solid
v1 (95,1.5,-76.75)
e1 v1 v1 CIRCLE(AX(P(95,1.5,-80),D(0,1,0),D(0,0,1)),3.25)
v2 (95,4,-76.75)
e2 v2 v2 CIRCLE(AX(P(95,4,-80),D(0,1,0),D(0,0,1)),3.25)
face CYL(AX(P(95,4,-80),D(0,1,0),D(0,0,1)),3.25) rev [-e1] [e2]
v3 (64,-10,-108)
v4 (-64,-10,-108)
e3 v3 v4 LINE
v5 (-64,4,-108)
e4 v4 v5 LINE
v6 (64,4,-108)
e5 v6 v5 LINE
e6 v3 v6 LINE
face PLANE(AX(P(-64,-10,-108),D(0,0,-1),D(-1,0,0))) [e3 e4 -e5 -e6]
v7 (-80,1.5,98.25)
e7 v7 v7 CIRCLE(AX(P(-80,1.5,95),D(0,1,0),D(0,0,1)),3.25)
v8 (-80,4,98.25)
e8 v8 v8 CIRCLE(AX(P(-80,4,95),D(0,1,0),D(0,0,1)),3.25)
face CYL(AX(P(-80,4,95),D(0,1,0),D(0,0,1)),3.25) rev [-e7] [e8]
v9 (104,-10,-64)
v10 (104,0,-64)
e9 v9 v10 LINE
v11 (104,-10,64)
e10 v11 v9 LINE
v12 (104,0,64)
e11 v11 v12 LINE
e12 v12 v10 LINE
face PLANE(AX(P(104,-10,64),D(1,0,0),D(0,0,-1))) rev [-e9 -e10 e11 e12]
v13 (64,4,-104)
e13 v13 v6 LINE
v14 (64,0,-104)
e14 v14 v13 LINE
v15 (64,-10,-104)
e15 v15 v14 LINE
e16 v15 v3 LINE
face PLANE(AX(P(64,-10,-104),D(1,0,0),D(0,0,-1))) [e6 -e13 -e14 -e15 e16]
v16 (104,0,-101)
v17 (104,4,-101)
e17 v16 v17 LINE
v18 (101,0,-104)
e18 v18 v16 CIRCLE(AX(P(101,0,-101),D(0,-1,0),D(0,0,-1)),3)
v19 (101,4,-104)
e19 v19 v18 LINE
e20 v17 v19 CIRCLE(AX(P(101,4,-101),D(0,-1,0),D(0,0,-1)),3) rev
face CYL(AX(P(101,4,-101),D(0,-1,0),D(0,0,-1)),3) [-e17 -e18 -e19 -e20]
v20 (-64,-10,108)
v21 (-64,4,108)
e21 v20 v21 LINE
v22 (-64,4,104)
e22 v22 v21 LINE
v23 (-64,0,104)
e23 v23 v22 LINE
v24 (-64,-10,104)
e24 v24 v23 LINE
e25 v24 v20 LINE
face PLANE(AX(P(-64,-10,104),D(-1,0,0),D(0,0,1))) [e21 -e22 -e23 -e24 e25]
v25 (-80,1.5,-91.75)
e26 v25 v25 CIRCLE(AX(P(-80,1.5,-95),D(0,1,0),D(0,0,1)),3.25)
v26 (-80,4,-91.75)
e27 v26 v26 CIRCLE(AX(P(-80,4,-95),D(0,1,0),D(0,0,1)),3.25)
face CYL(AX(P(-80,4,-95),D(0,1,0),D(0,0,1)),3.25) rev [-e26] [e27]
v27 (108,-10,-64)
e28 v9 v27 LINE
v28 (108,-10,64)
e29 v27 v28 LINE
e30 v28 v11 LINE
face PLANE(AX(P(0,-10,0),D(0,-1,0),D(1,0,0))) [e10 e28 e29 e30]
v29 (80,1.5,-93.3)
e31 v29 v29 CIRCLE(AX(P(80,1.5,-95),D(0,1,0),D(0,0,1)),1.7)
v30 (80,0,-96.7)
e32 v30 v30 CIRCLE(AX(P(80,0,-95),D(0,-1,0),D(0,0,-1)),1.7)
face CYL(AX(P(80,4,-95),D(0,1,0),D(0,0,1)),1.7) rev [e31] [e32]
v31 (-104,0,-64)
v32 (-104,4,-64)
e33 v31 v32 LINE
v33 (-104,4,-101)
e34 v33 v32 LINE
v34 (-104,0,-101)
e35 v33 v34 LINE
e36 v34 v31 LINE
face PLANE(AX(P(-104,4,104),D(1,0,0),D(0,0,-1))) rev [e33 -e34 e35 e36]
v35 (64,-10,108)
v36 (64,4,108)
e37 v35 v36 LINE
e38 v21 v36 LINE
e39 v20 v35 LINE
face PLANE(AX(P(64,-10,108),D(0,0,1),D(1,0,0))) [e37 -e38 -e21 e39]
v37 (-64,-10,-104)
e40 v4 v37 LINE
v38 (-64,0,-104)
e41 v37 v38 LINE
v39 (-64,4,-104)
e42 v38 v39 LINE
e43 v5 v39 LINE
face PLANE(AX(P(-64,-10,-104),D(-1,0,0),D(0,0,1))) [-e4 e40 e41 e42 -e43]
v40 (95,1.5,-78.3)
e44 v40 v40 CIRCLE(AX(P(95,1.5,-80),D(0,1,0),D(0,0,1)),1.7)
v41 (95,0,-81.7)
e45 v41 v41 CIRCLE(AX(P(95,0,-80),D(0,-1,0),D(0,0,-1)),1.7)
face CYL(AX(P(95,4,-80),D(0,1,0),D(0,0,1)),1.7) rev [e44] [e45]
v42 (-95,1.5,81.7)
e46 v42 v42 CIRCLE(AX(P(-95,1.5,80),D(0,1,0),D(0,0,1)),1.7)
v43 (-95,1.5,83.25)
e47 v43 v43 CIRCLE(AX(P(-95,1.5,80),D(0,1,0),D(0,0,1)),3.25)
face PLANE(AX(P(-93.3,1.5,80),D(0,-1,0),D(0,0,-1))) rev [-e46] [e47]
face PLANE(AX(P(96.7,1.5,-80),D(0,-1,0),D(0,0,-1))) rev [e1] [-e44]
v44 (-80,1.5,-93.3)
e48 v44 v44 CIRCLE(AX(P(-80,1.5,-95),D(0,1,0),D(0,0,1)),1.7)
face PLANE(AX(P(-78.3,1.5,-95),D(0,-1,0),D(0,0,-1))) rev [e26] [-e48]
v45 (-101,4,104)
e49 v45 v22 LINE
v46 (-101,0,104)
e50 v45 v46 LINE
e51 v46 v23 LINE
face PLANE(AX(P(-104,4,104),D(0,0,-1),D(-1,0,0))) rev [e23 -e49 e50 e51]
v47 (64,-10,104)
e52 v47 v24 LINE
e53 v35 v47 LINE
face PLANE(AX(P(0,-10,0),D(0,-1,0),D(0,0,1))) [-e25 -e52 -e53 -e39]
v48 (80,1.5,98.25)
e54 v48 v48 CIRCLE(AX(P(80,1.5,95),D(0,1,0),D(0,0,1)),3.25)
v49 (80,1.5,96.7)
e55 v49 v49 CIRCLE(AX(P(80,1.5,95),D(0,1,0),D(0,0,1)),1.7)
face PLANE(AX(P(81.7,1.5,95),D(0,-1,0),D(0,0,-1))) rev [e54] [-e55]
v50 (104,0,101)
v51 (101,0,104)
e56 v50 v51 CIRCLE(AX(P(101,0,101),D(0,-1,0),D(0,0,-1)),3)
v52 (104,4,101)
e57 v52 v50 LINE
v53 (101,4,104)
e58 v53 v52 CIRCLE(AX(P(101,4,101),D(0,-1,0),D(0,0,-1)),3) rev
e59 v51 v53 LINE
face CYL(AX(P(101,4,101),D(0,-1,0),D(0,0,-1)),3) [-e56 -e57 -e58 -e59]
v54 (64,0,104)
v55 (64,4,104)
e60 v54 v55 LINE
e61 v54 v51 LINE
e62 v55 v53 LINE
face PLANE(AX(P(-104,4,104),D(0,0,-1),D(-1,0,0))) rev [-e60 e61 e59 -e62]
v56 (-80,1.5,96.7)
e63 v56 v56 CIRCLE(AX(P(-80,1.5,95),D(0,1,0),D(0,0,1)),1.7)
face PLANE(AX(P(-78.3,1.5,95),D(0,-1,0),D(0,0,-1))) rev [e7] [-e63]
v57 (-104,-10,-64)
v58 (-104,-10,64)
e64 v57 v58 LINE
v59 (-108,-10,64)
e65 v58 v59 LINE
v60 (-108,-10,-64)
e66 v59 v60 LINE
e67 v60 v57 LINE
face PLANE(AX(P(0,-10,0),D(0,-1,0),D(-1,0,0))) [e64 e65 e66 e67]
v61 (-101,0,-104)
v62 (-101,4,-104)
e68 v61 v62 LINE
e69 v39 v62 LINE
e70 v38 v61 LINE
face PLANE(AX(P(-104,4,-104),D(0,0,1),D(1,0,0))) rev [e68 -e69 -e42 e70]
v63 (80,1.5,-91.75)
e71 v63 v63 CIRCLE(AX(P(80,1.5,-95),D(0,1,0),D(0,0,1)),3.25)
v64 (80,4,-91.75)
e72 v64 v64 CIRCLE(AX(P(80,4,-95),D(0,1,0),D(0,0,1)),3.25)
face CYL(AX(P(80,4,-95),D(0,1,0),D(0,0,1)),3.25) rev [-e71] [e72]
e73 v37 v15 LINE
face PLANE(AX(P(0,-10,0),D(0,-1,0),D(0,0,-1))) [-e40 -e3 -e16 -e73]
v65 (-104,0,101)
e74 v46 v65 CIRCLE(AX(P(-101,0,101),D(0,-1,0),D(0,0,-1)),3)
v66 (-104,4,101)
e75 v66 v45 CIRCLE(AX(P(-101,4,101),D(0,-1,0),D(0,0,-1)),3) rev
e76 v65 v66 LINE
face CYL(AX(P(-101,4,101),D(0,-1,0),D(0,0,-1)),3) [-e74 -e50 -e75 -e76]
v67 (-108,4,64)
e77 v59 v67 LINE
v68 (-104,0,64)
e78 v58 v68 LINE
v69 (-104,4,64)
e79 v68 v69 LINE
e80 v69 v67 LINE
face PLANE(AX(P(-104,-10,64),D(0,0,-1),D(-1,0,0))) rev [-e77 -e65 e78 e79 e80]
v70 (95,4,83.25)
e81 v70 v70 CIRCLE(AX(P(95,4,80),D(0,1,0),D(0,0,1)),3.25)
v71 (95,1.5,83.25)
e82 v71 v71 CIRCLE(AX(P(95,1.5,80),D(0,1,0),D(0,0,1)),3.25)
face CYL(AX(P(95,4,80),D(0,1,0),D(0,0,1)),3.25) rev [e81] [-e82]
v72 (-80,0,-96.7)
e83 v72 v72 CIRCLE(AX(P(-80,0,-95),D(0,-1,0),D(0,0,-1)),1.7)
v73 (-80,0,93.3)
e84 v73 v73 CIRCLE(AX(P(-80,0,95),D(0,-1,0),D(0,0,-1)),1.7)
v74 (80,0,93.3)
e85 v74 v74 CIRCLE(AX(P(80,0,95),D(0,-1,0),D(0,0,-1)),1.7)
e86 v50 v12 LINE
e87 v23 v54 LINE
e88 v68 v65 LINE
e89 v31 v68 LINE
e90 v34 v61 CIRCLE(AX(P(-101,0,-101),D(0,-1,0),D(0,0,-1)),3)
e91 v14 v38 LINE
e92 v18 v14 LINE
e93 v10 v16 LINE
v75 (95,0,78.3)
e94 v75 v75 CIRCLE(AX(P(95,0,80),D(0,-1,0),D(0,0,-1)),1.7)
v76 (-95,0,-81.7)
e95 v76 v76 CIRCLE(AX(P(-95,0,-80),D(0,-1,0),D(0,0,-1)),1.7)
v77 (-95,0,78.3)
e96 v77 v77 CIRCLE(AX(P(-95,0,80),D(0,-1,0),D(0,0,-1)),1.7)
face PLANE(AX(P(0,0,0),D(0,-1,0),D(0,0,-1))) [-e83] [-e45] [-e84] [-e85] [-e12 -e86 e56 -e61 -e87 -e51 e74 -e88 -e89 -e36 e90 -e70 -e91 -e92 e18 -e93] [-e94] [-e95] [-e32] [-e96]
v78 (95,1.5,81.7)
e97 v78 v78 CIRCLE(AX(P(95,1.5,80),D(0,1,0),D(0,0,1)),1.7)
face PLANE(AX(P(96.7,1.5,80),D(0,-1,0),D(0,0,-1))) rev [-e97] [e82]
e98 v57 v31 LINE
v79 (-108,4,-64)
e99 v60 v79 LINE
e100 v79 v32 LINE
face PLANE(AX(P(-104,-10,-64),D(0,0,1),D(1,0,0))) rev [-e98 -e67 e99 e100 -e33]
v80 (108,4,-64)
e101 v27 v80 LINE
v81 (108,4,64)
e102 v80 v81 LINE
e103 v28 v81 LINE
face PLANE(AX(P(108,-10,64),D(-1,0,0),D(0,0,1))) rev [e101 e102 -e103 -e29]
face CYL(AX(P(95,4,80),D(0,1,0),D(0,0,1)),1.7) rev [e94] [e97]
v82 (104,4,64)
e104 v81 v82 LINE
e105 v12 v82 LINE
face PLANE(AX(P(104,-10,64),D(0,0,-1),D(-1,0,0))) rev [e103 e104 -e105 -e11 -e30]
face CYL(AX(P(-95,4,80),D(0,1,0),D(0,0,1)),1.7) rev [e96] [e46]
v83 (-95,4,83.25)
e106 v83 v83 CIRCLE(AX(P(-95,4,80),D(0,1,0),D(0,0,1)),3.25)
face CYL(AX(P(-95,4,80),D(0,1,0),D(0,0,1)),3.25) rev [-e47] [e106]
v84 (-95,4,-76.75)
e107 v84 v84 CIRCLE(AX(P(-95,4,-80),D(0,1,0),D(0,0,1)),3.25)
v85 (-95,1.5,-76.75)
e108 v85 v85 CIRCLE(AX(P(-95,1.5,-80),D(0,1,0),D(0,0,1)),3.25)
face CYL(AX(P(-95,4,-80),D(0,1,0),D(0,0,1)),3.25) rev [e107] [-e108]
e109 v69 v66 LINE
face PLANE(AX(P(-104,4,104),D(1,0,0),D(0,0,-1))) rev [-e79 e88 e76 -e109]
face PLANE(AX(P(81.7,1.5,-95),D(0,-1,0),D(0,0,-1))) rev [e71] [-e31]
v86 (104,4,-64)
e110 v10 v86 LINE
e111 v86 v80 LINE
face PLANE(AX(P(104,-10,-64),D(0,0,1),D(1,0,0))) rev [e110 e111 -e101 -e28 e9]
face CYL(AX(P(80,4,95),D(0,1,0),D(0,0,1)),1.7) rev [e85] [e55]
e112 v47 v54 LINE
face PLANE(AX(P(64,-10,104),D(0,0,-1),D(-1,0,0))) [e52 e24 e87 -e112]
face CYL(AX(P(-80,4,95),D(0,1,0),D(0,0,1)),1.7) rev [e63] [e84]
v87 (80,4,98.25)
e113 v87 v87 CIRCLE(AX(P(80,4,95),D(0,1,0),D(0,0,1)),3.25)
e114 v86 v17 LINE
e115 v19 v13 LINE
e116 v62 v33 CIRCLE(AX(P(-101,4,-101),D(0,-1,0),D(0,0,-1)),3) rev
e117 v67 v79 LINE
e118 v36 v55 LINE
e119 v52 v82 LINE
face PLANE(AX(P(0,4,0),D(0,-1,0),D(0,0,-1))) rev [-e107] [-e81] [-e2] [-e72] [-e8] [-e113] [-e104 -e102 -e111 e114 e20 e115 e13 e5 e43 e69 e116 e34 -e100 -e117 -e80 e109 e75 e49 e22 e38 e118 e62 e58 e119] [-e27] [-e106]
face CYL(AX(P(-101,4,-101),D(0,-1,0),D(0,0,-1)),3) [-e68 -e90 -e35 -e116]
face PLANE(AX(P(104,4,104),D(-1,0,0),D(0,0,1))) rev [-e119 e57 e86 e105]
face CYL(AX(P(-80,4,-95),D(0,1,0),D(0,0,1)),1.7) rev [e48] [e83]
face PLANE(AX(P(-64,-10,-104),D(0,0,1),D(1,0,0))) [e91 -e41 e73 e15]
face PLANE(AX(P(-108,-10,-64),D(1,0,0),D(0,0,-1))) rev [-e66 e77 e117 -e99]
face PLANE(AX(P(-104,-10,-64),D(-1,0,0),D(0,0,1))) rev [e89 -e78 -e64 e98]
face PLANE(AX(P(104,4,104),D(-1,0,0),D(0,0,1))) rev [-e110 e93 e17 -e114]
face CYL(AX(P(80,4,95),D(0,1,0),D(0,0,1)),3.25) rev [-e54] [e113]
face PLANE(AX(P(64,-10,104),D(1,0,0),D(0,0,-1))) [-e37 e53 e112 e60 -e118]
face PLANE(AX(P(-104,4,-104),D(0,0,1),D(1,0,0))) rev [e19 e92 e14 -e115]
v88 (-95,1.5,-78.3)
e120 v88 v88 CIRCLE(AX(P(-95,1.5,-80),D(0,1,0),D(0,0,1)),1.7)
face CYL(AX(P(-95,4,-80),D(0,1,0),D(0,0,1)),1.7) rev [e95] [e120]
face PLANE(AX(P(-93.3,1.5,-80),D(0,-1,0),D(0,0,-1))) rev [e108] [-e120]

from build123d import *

# Parameters (mm, degrees)
SKETCH1_W                              = 208
SKETCH1_H                              = 208
BASE_PLATE_DEPTH                       = 4
MOUNTING_HOLES_START                   = 1.5
MOUNTING_HOLES_OUTLINE_R               = 3.25
MOUNTING_HOLES_DEPTH                   = 2.5
MOUNTING_HOLES_2_OUTLINE_R             = 1.7
MOUNTING_HOLES_2_DEPTH                 = 1.5
MOUNTING_HOLES_MIRROR2_START           = 1.5
MOUNTING_HOLES_MIRROR2_COPY_1_SKETCH_R = 3.25
MOUNTING_HOLES_MIRROR2_COPY_1_DEPTH    = 2.5
MOUNTING_HOLES_MIRROR2_COPY_2_SKETCH_R = 1.7
MOUNTING_HOLES_MIRROR2_COPY_2_DEPTH    = 1.5
MOUNTING_HOLES_MIRROR2_COPY_3_SKETCH_R = 1.7
MOUNTING_HOLES_MIRROR2_COPY_3_DEPTH    = 1.5
SKETCH5_W                              = 128
SKETCH5_H                              = 4
SIDE_EXTRUSION_DEPTH                   = 14
SIDE_EXTRUSION_MIRROR2_COPY_1_SKETCH_W = 128
SIDE_EXTRUSION_MIRROR2_COPY_1_SKETCH_H = 4
SIDE_EXTRUSION_MIRROR2_COPY_1_DEPTH    = 14
EDGE_FILLETS_R                         = 3


# Read off the part's stored shape, not the designer's step: mounting_holes
with BuildPart() as part:
    # Sketch1 → base_plate (new body)
    with BuildSketch(Plane(origin=(0, 0, 0), x_dir=(1, 0, 0), z_dir=(0, 1, 0))):
        Rectangle(SKETCH1_W, SKETCH1_H)
    extrude(amount=BASE_PLATE_DEPTH)

    # mounting_holes outline → mounting_holes (cut)
    with BuildSketch(Plane(origin=(0, 0, 0), x_dir=(1, 0, 0), z_dir=(0, 1, 0)).offset(MOUNTING_HOLES_START)):
        with Locations((95, 80)):
            Circle(MOUNTING_HOLES_OUTLINE_R)
        with Locations((80, 95)):
            Circle(MOUNTING_HOLES_OUTLINE_R)
    mounting_holes = extrude(amount=MOUNTING_HOLES_DEPTH, mode=Mode.SUBTRACT)

    # mounting_holes 2 outline → mounting_holes 2 (cut)
    with BuildSketch(Plane(origin=(0, 0, 0), x_dir=(1, 0, 0), z_dir=(0, 1, 0))):
        with Locations((95, 80)):
            Circle(MOUNTING_HOLES_2_OUTLINE_R)
        with Locations((80, 95)):
            Circle(MOUNTING_HOLES_2_OUTLINE_R)
    mounting_holes_2 = extrude(amount=MOUNTING_HOLES_2_DEPTH, mode=Mode.SUBTRACT)

    # mounting_holes_mirror1: mounting_holes, mounting_holes 2 across plane
    add(mounting_holes.mirror(Plane.XY), mode=Mode.SUBTRACT)
    add(mounting_holes_2.mirror(Plane.XY), mode=Mode.SUBTRACT)

    # mounting_holes_mirror2: mounting_holes, mounting_holes 2 across plane
    add(mounting_holes.mirror(Plane(origin=(0, 0, 0), x_dir=(0, 0, 1), z_dir=(1, 0, 0))), mode=Mode.SUBTRACT)
    add(mounting_holes_2.mirror(Plane(origin=(0, 0, 0), x_dir=(0, 0, 1), z_dir=(1, 0, 0))), mode=Mode.SUBTRACT)

    # mounting_holes_mirror2 copy 1 sketch → mounting_holes_mirror2 copy 1 (cut)
    with BuildSketch(Plane(origin=(0, 0, 0), x_dir=(-1, 0, 0), z_dir=(0, 1, 0)).offset(MOUNTING_HOLES_MIRROR2_START)):
        with Locations((95, 80)):
            Circle(MOUNTING_HOLES_MIRROR2_COPY_1_SKETCH_R)
        with Locations((80, 95)):
            Circle(MOUNTING_HOLES_MIRROR2_COPY_1_SKETCH_R)
    extrude(amount=MOUNTING_HOLES_MIRROR2_COPY_1_DEPTH, mode=Mode.SUBTRACT)

    # mounting_holes_mirror2 copy 2 sketch → mounting_holes_mirror2 copy 2 (cut)
    with BuildSketch(Plane(origin=(0, 0, 0), x_dir=(-1, 0, 0), z_dir=(0, 1, 0))):
        with Locations((95, 80)):
            Circle(MOUNTING_HOLES_MIRROR2_COPY_2_SKETCH_R)
        with Locations((80, 95)):
            Circle(MOUNTING_HOLES_MIRROR2_COPY_2_SKETCH_R)
    extrude(amount=MOUNTING_HOLES_MIRROR2_COPY_2_DEPTH, mode=Mode.SUBTRACT)

    # mounting_holes_mirror2 copy 3 sketch → mounting_holes_mirror2 copy 3 (cut)
    with BuildSketch(Plane(origin=(0, 0, 0), x_dir=(-1, 0, 0), z_dir=(0, 1, 0))):
        with Locations((95, -80)):
            Circle(MOUNTING_HOLES_MIRROR2_COPY_3_SKETCH_R)
        with Locations((80, -95)):
            Circle(MOUNTING_HOLES_MIRROR2_COPY_3_SKETCH_R)
    extrude(amount=MOUNTING_HOLES_MIRROR2_COPY_3_DEPTH, mode=Mode.SUBTRACT)

    # Sketch5 → side_extrusion (add)
    with BuildSketch(Plane(origin=(0, 4, 0), x_dir=(1, 0, 0), z_dir=(0, 1, 0))):
        with Locations((0, 106)):
            Rectangle(SKETCH5_W, SKETCH5_H)
    side_extrusion = extrude(amount=-SIDE_EXTRUSION_DEPTH)

    # side_extrusion_mirror1: side_extrusion across plane
    add(side_extrusion.mirror(Plane(origin=(0, 0, 0), x_dir=(0.7071067811865476, 0, 0.7071067811865476), z_dir=(0.7071067811865477, 0, -0.7071067811865475))))

    # side_extrusion_mirror2: side_extrusion across plane
    add(side_extrusion.mirror(Plane(origin=(0, 0, 0), x_dir=(-0.7071067811865476, 0, 0.7071067811865476), z_dir=(0.7071067811865477, 0, 0.7071067811865475))))

    # side_extrusion_mirror2 copy 1 sketch → side_extrusion_mirror2 copy 1 (add)
    with BuildSketch(Plane(origin=(0, 4, 0), x_dir=(-1, 0, 0), z_dir=(0, 1, 0))):
        with Locations((0, 106)):
            Rectangle(SIDE_EXTRUSION_MIRROR2_COPY_1_SKETCH_W, SIDE_EXTRUSION_MIRROR2_COPY_1_SKETCH_H)
    extrude(amount=-SIDE_EXTRUSION_MIRROR2_COPY_1_DEPTH)

    # edge_fillets
    edge_fillets_edges = [part.edges().sort_by_distance(p)[0] for p in [
        (104, 2, 104),
        (-104, 2, 104),
        (-104, 2, -104),
        (104, 2, -104),
    ]]
    fillet(edge_fillets_edges, radius=EDGE_FILLETS_R)


solid = part.part
